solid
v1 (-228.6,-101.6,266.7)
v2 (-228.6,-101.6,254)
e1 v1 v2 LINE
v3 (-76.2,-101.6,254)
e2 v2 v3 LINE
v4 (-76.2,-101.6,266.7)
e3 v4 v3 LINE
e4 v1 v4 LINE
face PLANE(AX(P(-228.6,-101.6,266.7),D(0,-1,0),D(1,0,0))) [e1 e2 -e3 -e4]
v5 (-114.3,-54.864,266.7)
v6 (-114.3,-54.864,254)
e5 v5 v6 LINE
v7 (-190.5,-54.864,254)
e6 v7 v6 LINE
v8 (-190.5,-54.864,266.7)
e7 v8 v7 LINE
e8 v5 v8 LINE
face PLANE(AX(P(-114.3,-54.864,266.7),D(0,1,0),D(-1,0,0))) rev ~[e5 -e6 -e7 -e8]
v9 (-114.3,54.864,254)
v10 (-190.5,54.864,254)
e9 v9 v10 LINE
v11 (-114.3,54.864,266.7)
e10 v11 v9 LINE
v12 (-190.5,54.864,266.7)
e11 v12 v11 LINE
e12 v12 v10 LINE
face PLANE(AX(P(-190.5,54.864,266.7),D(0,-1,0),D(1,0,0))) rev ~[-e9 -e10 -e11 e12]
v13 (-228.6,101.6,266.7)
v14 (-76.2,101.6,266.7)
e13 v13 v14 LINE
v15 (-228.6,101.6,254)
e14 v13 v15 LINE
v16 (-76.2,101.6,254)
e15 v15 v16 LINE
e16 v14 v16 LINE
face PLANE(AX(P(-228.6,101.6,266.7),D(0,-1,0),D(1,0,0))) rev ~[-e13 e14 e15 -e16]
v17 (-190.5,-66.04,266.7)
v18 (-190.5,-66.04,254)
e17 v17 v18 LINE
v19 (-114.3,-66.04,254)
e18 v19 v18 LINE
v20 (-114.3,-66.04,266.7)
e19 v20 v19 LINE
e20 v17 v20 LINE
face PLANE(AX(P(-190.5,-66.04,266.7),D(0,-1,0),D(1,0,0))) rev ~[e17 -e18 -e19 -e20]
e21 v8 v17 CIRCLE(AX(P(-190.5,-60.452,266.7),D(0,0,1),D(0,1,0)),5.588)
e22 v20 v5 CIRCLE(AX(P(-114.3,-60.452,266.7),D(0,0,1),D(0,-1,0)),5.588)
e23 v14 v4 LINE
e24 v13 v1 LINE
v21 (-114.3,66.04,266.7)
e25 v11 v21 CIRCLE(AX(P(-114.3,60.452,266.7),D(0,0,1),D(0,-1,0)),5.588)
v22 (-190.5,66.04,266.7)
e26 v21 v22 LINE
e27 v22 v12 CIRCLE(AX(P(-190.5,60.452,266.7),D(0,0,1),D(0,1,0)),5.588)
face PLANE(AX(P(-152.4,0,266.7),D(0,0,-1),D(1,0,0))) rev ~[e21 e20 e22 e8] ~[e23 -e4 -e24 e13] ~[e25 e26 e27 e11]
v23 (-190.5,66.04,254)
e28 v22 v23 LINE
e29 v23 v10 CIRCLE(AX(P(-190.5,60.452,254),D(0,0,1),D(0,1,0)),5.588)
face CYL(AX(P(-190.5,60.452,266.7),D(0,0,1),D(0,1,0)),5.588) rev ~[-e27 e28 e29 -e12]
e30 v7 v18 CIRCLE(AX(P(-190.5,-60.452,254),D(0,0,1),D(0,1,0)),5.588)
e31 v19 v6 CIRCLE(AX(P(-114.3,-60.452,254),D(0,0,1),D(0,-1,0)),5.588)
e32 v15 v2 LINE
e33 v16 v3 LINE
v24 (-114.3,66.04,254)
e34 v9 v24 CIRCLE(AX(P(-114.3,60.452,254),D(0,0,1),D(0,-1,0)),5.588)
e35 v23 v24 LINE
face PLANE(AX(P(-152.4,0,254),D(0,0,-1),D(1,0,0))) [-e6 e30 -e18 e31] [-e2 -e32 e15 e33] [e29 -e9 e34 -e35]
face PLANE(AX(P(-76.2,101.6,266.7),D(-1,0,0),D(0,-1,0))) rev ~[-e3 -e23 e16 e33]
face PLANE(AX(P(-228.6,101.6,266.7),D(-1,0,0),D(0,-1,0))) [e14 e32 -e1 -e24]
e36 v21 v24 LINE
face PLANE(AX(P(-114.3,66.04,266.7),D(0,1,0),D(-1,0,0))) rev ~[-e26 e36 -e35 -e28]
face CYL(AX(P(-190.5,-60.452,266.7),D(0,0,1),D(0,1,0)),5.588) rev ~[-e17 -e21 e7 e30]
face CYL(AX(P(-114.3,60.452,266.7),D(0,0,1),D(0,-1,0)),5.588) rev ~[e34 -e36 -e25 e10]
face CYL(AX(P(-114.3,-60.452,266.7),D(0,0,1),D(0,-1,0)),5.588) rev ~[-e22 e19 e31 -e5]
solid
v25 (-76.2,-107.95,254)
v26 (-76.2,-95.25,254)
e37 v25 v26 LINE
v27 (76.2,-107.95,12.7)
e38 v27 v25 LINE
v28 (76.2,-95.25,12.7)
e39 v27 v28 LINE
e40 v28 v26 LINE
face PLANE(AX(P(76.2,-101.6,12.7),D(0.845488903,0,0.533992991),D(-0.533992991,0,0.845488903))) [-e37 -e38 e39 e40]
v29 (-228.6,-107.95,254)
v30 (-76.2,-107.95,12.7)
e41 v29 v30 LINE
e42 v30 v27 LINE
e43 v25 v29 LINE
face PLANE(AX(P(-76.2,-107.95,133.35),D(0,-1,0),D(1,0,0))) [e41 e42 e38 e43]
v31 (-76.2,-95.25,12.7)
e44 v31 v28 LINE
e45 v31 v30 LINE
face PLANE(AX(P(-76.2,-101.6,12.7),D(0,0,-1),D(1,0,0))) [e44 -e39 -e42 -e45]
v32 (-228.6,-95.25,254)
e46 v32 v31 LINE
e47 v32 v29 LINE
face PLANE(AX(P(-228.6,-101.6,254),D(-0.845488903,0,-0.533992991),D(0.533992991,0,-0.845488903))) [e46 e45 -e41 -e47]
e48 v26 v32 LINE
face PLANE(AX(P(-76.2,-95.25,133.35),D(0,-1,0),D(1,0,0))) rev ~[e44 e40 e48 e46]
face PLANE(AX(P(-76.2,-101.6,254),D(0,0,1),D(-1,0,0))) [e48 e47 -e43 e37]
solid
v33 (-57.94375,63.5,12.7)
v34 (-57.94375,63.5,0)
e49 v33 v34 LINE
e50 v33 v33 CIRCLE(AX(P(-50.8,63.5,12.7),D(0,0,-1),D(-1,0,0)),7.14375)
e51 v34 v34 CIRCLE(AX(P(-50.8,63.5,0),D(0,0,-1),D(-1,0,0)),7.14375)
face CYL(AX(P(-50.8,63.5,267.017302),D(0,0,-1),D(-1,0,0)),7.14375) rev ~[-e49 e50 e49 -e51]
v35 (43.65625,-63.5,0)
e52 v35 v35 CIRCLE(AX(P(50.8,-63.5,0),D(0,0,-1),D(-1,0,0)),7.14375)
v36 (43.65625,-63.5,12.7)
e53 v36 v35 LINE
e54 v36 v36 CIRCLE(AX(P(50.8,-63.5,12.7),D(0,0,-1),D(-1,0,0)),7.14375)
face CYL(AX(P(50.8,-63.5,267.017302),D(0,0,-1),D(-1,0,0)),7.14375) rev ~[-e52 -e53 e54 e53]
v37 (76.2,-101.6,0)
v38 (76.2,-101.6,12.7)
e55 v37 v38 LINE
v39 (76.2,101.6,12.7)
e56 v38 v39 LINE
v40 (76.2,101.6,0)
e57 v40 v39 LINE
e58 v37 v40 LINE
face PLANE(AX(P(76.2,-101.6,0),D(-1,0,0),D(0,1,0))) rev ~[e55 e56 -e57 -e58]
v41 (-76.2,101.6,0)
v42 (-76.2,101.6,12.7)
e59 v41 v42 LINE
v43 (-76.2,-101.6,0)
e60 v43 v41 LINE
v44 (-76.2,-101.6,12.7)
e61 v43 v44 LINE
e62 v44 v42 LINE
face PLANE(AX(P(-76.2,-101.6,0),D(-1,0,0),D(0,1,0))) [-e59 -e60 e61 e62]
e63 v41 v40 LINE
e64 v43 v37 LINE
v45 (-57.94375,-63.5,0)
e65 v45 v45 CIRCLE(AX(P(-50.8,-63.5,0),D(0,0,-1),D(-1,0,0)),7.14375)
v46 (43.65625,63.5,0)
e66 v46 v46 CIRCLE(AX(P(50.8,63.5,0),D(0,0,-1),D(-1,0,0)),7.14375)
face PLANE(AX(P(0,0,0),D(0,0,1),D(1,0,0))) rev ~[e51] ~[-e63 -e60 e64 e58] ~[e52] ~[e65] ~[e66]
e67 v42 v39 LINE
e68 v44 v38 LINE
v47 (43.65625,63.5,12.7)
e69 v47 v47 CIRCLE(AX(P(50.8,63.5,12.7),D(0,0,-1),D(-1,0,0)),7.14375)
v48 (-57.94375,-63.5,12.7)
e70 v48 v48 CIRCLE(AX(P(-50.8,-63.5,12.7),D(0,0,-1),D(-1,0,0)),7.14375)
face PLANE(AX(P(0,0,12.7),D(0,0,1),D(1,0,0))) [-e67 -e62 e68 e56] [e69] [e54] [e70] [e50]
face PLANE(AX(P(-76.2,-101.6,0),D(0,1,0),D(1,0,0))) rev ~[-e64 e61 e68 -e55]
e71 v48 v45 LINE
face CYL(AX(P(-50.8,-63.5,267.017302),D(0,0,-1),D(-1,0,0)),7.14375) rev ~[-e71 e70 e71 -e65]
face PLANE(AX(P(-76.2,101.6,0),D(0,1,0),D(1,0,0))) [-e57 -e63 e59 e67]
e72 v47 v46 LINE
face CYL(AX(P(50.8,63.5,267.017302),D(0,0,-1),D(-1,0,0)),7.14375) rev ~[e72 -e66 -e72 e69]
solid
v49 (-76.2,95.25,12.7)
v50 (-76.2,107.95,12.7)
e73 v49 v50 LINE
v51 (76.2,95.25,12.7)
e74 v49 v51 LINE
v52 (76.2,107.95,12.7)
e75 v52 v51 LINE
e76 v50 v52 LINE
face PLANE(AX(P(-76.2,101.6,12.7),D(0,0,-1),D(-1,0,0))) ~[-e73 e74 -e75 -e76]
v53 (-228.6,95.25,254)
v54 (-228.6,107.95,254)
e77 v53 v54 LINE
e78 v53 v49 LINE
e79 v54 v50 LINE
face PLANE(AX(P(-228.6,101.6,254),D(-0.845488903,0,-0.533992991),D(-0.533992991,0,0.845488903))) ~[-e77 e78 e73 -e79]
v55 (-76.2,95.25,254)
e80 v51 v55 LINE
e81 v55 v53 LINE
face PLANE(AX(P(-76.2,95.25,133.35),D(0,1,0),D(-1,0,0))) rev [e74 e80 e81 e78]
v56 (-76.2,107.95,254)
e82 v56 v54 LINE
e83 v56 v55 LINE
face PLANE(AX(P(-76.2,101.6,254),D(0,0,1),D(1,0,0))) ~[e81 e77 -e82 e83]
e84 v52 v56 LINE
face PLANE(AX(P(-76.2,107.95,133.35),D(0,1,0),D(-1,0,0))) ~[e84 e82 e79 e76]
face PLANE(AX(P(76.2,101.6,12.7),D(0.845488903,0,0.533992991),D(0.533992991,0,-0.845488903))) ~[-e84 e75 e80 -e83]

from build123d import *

# Parameters (mm, degrees)
F0_W      = 152.4
F0_H      = 203.2
F1_DEPTH  = 12.7
F3_D      = 14.2875
F5_W      = 152.4
F5_H      = 203.2
F6_DEPTH  = 12.7
F8_DEPTH  = 266.701
F10_DEPTH = 6.35


# Not quite as in the source:
# - a length typed as a fraction of an inch, garbled in the dataset ("3 / 203.2 mm" for 3/8 in), is restored


with BuildPart() as f1:
    # F0 (on Top) → F1 (new body)
    with BuildSketch(Plane.XY):
        Rectangle(F0_W, F0_H)
    extrude(amount=F1_DEPTH)

    # F3 (through all)
    with Locations(Plane.XY.offset(12.7)):
        with Locations((-50.8, 63.5), (50.8, 63.5), (-50.8, -63.5), (50.8, -63.5)):
            Hole(F3_D / 2)


with BuildPart() as f6:
    # F5 (on offset) → F6 (new body)
    with BuildSketch(Plane(origin=(0, 0, 266.7), x_dir=(1, 0, 0), z_dir=(0, 0, -1))):
        with Locations((-152.4, 0)):
            Rectangle(F5_W, F5_H)
    extrude(amount=F6_DEPTH)

    # F7 (on face) → F8 (cut, through all)
    with BuildSketch(Plane.XY.offset(266.7)):
        with BuildLine():
            ThreePointArc((-190.5, -54.864), (-196.088, -60.452), (-190.5, -66.04))
            Line((-190.5, -66.04), (-114.3, -66.04))
            ThreePointArc((-114.3, -66.04), (-108.712, -60.452), (-114.3, -54.864))
            Line((-114.3, -54.864), (-190.5, -54.864))
        make_face()
        with BuildLine():
            Line((-190.5, 54.864), (-114.3, 54.864))
            ThreePointArc((-114.3, 54.864), (-108.712, 60.452), (-114.3, 66.04))
            Line((-114.3, 66.04), (-190.5, 66.04))
            ThreePointArc((-190.5, 66.04), (-196.088, 60.452), (-190.5, 54.864))
        make_face()
    extrude(amount=-F8_DEPTH, mode=Mode.SUBTRACT)


with BuildPart() as f10:
    # F9 (on face) → F10 (new body, symmetric)
    with BuildSketch(Plane.XZ.offset(101.6)):
        Polygon((-76.2, 254), (-228.6, 254), (-76.2, 12.7), (76.2, 12.7), align=None)
    extrude(amount=F10_DEPTH, both=True)


with BuildPart() as f11_1:
    # F11: instance of F10
    add(f10.part.mirror(Plane.XZ))


solid = Compound([f1.part, f6.part, f10.part, f11_1.part])
